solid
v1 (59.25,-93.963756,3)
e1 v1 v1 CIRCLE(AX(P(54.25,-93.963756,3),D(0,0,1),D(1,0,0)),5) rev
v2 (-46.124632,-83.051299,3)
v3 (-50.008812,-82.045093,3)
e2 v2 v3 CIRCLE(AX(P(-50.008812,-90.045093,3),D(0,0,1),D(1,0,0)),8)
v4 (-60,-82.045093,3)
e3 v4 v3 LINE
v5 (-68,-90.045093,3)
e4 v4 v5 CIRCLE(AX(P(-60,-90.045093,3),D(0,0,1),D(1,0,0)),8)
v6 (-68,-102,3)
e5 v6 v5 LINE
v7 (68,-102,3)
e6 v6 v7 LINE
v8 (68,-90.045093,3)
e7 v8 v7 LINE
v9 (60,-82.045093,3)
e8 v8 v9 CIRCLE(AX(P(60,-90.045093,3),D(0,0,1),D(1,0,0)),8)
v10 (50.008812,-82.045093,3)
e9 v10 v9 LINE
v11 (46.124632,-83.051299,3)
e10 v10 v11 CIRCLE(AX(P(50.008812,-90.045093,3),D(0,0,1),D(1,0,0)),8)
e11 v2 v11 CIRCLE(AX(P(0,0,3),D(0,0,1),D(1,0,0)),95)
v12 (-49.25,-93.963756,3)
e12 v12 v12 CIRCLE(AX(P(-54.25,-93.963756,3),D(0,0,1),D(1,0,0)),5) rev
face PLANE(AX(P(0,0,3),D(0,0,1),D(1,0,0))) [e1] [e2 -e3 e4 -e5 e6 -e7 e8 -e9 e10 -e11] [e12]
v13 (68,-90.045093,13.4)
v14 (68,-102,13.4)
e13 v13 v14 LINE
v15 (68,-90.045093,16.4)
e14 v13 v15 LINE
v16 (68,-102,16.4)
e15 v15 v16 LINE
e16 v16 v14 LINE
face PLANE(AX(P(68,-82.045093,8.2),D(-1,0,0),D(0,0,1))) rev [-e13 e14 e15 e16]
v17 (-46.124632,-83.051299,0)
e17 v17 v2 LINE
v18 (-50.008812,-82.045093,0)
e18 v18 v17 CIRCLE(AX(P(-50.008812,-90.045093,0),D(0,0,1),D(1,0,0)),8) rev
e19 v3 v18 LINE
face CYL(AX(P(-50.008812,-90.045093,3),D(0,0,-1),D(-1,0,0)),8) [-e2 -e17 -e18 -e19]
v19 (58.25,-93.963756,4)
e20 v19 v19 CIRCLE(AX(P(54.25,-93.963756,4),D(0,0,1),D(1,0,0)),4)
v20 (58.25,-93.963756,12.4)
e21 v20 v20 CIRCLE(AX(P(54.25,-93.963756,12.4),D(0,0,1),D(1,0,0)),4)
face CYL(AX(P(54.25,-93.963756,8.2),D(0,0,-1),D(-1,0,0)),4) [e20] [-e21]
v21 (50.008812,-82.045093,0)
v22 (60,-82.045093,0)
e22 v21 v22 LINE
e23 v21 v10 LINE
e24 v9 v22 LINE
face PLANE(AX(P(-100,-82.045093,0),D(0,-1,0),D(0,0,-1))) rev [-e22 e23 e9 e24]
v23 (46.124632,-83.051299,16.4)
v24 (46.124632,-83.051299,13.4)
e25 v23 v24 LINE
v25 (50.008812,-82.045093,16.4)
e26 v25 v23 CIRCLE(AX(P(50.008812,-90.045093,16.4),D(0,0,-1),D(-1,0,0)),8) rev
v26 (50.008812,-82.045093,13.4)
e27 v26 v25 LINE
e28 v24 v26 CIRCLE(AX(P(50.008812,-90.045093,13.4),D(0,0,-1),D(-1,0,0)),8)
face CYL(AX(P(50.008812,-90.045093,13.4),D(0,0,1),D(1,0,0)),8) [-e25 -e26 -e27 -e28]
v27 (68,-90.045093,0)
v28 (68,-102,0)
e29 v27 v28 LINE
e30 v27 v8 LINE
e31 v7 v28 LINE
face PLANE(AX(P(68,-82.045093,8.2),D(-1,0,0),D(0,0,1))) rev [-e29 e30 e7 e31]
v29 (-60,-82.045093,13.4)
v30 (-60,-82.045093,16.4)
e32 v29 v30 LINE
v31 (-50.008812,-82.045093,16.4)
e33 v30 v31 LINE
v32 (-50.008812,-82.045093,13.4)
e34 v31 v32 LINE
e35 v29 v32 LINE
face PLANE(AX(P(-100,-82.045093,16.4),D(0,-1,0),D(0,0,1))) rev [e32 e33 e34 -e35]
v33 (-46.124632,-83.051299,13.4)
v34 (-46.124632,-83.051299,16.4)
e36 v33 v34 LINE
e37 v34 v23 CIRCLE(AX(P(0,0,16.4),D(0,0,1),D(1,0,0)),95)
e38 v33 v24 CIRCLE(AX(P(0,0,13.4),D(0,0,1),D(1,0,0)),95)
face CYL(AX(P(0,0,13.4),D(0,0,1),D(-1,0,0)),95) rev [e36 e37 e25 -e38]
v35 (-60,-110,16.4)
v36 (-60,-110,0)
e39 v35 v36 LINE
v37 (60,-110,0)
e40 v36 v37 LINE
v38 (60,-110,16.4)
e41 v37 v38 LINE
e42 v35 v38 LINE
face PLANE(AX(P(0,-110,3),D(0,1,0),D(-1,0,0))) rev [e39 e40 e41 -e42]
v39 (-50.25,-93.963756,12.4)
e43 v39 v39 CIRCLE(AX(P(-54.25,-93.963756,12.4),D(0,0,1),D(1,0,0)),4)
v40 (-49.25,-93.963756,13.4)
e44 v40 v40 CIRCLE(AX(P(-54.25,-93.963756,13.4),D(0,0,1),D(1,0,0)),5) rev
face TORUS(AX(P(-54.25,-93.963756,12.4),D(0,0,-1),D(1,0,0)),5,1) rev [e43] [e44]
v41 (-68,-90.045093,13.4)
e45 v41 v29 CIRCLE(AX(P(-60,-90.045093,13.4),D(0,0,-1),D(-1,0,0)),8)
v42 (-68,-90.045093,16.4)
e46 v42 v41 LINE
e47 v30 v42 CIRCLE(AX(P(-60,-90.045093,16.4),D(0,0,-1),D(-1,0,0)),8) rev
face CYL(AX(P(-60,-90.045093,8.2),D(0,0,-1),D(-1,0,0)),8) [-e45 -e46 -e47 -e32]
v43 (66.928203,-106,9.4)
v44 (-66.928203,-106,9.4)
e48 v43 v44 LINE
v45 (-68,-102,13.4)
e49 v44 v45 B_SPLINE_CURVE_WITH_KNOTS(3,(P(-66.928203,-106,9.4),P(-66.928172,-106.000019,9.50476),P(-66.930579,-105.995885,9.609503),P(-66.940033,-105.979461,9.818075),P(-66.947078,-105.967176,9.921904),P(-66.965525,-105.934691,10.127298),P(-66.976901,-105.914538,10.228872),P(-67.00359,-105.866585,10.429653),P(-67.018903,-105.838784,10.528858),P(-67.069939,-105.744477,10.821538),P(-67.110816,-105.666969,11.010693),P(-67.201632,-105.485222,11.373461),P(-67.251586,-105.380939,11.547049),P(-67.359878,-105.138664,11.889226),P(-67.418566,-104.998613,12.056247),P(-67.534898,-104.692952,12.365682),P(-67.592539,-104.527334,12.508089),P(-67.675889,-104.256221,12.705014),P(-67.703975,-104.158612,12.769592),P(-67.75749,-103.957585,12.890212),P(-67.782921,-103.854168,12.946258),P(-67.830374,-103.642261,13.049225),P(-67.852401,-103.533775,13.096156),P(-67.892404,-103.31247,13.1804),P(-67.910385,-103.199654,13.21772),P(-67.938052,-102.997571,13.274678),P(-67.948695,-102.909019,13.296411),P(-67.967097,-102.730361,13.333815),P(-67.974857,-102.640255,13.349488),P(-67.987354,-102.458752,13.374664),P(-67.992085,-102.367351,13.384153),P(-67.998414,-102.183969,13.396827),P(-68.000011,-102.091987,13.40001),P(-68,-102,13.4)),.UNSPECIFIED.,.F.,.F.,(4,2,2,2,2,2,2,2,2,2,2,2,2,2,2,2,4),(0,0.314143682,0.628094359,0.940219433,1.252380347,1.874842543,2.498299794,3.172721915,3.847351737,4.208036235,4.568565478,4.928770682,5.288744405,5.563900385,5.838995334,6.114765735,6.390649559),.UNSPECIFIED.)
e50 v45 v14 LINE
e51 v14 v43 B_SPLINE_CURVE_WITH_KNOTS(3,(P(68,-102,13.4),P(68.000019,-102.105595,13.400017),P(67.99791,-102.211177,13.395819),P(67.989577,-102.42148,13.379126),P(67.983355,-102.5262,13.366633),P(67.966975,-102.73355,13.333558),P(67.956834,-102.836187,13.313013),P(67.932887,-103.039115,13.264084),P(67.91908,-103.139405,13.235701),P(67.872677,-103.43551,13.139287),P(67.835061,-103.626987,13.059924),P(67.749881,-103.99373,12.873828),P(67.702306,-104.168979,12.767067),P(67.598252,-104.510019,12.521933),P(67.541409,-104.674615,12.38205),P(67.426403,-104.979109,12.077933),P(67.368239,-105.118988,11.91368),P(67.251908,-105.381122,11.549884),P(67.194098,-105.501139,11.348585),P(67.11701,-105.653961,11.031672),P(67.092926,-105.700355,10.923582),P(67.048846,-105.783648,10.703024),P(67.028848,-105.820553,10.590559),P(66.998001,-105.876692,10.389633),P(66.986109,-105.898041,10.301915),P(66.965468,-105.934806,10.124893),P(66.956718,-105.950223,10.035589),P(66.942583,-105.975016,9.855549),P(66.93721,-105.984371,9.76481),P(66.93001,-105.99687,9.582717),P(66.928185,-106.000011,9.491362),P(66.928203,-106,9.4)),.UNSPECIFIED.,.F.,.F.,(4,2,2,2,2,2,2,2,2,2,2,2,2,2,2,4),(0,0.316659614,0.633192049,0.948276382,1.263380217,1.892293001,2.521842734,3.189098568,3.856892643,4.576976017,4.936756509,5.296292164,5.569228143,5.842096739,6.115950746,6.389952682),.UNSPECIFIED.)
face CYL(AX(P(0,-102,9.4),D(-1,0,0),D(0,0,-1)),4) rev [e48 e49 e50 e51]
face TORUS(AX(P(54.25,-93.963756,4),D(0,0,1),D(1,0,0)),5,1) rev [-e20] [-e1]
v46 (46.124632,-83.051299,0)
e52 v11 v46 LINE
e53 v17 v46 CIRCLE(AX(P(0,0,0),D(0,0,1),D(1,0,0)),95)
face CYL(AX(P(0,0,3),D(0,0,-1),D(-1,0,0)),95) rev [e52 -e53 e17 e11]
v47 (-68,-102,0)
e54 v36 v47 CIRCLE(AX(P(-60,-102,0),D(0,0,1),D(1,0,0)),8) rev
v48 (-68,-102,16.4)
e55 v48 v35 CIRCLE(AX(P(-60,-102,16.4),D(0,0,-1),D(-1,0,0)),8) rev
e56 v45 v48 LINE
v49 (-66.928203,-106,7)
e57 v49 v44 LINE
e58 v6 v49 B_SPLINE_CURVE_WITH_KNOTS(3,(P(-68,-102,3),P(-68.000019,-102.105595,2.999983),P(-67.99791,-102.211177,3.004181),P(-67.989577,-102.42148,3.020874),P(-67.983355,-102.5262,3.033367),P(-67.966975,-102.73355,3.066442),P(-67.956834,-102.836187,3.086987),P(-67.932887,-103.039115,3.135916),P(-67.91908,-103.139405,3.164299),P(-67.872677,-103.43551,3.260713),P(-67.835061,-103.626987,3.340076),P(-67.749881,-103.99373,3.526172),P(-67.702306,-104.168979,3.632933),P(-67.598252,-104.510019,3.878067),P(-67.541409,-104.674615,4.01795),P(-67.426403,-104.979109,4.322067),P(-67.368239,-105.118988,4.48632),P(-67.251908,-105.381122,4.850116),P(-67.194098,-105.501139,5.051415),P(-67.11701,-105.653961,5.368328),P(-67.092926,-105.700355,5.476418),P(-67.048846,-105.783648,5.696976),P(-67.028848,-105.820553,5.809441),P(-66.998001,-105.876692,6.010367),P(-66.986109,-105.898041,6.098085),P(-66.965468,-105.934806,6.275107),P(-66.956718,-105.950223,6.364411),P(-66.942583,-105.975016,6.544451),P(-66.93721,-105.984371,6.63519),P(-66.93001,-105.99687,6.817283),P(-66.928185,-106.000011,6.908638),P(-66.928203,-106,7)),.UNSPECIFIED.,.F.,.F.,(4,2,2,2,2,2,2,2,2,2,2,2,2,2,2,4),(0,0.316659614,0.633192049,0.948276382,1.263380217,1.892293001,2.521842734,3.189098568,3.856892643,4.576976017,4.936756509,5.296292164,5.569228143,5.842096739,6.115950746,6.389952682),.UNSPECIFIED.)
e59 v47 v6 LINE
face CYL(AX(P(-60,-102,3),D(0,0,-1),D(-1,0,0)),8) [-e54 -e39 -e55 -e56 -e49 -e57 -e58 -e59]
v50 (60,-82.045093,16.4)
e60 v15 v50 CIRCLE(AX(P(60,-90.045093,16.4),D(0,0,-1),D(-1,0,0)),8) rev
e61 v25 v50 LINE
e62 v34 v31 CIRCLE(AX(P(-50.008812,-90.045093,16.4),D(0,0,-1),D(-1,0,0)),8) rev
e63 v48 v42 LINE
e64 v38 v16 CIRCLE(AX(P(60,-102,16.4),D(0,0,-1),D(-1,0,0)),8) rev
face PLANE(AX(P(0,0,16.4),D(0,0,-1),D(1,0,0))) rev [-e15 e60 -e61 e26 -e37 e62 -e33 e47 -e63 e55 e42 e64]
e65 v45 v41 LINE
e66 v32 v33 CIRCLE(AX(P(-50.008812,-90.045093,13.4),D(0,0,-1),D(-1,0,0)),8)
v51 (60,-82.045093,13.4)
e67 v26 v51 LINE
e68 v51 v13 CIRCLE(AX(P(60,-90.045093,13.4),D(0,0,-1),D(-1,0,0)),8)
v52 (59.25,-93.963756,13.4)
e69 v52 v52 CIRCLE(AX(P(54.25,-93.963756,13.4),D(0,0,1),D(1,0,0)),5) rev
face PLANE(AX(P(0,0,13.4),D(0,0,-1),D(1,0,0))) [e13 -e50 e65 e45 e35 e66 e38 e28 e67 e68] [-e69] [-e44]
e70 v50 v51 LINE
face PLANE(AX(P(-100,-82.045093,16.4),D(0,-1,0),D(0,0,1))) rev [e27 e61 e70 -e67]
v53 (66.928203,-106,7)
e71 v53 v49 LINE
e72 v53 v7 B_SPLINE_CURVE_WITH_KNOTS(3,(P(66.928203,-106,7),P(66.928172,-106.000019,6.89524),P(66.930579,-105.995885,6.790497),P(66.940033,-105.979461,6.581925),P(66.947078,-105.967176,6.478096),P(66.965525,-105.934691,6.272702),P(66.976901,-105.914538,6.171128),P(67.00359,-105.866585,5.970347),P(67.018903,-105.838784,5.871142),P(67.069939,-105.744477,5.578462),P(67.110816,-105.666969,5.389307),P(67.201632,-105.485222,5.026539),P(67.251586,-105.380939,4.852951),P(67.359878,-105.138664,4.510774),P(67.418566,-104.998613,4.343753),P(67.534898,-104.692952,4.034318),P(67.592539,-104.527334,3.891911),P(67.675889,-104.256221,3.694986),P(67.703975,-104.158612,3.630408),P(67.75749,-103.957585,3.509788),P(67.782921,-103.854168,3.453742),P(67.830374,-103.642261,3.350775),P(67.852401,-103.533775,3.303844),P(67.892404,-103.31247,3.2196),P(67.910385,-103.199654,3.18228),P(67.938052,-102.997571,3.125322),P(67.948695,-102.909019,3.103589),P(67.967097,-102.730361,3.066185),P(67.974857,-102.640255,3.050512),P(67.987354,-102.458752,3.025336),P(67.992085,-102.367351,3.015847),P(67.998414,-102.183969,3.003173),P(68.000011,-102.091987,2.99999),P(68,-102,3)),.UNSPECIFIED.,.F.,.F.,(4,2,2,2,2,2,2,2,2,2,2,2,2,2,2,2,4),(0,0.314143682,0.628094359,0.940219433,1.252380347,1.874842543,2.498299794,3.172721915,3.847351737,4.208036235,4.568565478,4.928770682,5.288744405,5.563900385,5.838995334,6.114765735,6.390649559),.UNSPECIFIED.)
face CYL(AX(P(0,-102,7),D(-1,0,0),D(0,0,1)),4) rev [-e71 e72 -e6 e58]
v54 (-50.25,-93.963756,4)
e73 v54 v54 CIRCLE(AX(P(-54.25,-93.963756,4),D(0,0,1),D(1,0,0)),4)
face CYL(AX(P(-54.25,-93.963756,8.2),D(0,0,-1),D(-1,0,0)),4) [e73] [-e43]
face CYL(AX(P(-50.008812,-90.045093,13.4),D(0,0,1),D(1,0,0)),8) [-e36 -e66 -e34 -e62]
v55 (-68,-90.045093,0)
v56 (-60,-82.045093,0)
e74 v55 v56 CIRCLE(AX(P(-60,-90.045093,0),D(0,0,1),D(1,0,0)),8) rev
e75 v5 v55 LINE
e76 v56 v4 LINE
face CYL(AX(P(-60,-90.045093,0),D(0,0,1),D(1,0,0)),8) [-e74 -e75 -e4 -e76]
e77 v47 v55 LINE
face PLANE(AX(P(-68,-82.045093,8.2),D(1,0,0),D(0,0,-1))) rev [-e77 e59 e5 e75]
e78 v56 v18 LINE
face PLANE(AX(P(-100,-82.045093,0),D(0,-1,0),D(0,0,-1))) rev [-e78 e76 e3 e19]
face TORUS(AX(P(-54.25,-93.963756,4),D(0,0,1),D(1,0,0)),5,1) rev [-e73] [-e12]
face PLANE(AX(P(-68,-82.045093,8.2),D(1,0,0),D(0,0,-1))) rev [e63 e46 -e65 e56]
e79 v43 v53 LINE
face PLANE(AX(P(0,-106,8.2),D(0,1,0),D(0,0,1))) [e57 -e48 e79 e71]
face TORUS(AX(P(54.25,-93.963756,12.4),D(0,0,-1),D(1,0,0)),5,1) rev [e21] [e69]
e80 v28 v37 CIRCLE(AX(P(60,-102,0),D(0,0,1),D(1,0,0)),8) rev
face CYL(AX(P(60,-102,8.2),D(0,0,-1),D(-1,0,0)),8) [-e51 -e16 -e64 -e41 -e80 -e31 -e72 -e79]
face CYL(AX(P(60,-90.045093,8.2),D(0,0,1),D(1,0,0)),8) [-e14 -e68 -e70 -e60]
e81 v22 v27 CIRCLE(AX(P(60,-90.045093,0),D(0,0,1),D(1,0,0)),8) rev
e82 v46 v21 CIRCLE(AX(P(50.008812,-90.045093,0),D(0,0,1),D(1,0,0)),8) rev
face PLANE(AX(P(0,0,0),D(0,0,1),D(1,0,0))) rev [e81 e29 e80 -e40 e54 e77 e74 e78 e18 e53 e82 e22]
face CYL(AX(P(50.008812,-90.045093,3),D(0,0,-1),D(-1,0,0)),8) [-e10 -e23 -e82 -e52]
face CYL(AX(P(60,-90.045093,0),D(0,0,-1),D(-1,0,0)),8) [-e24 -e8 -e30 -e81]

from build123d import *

# Parameters (mm, degrees)
BOSS_EXTRUDE1_DEPTH     = 3
SKETCH2_R               = 4
SKETCH2_W               = 200
SKETCH2_H               = 4
BOSS_EXTRUDE2_DEPTH     = 5.2
CUT_EXTRUDE3_DEPTH      = 149.751605033
CUT_EXTRUDE3_DEPTH_BACK = 149.751605033
SKETCH4_W               = 200.256598964
SKETCH4_H               = 45.821107358
CUT_EXTRUDE4_DEPTH      = 149.886668308
CUT_EXTRUDE4_DEPTH_BACK = 149.886668308
SKETCH5_W               = 32
SKETCH5_H               = 27.954907266
FILLET1_R               = 1
FILLET2_R               = 4
FILLET3_R               = 8
FILLET4_R               = 8


with BuildPart() as part:
    # Sketch1 → Boss-Extrude1 (new body)
    with BuildSketch(Plane.XY):
        with BuildLine():
            ThreePointArc((0, -110), (-59.410296816, -92.57654472), (-100, -45.82575695))
            Line((-100, -45.82575695), (-100, -110))
            Line((-100, -110), (0, -110))
        make_face()
        with BuildLine():
            ThreePointArc((0, -95), (-51.308892705, -79.95247044), (-86.363636364, -39.576790093))
            Line((-86.363636364, -39.576790093), (-100, -45.82575695))
            ThreePointArc((-100, -45.82575695), (-59.410296816, -92.57654472), (0, -110))
            Line((0, -110), (0, -95))
        make_face()
        with BuildLine():
            Line((100, -45.82575695), (86.363636364, -39.576790093))
            ThreePointArc((86.363636364, -39.576790093), (51.308892705, -79.95247044), (0, -95))
            Line((0, -95), (0, -110))
            ThreePointArc((0, -110), (59.410296816, -92.57654472), (100, -45.82575695))
        make_face()
        with BuildLine():
            Line((100, -110), (100, -45.82575695))
            ThreePointArc((100, -45.82575695), (59.410296816, -92.57654472), (0, -110))
            Line((0, -110), (100, -110))
        make_face()
    extrude(amount=BOSS_EXTRUDE1_DEPTH)

    # Sketch2 → Boss-Extrude2 (add)
    with BuildSketch(Plane.XY.offset(3)):
        with Locations((-54.25, -93.963756311)):
            Circle(SKETCH2_R)
        with Locations((54.25, -93.963756311)):
            Circle(SKETCH2_R)
        with Locations((0, -108)):
            Rectangle(SKETCH2_W, SKETCH2_H)
    extrude(amount=BOSS_EXTRUDE2_DEPTH)

    # Sketch4 → Cut-Extrude3 (cut, two sides: drawn at the far end of the back side and taken through both)
    with BuildSketch(Plane.XY.offset(3).offset(-CUT_EXTRUDE3_DEPTH_BACK)):
        with Locations((0.128299482, -59.134539055)):
            Rectangle(SKETCH4_W, SKETCH4_H)
    extrude(amount=CUT_EXTRUDE3_DEPTH + CUT_EXTRUDE3_DEPTH_BACK, mode=Mode.SUBTRACT)

    # Sketch5 → Cut-Extrude4 (cut, two sides: drawn at the far end of the back side and taken through both)
    with BuildSketch(Plane(origin=(0, 0, 0), x_dir=(-1, 0, 0), z_dir=(0, 0, -1)).offset(-CUT_EXTRUDE4_DEPTH_BACK)):
        with Locations((-84, -96.022546367)):
            Rectangle(SKETCH5_W, SKETCH5_H)
        with Locations((84, -96.022546367)):
            Rectangle(SKETCH5_W, SKETCH5_H)
    extrude(amount=CUT_EXTRUDE4_DEPTH + CUT_EXTRUDE4_DEPTH_BACK, mode=Mode.SUBTRACT)

    # Fillet1
    fillet1_edges = [part.edges().sort_by_distance(p)[0] for p in [
        (50.25, -93.963756311, 3),
        (-58.25, -93.963756311, 3),
    ]]
    fillet(fillet1_edges, radius=FILLET1_R)

    # Fillet2
    fillet2_edges = [part.edges().sort_by_distance(p)[0] for p in [
        (0, -106, 3),
    ]]
    fillet(fillet2_edges, radius=FILLET2_R)

    # Mirror1: part across plane


with BuildPart() as part_1:
    add(part.part)
    add(part.part.mirror(Plane.XY.offset(8.2)))

    # Fillet3
    # the kernel refuses this fillet: 8 mm, written as the material it takes off along each edge
    with BuildSketch(Plane(origin=(-68, -110, -20), x_dir=(1, 0, 0), z_dir=(0, 0, 1)), Plane(origin=(68, -110, 36.4), x_dir=(-1, 0, 0), z_dir=(0, 0, -1))) as fillet3_piece_1:
        with BuildLine():
            CenterArc((FILLET3_R, FILLET3_R), FILLET3_R, 180, 90)
            Line((0, FILLET3_R), (0, 0))
            Line((0, 0), (FILLET3_R, 0))
        make_face()
    extrude(amount=56.4, mode=Mode.SUBTRACT)
    with BuildSketch(Plane(origin=(-68, -82.045092734, -6.6), x_dir=(1, 0, 0), z_dir=(0, 0, 1)), Plane(origin=(68, -82.045092734, 36.4), x_dir=(-1, 0, 0), z_dir=(0, 0, -1))) as fillet3_piece_2:
        with BuildLine():
            CenterArc((FILLET3_R, -FILLET3_R), FILLET3_R, 90, 90)
            Line((0, -FILLET3_R), (0, 0))
            Line((0, 0), (FILLET3_R, 0))
        make_face()
    extrude(amount=43, mode=Mode.SUBTRACT)
    with BuildSketch(Plane(origin=(68, -82.045092734, -20), x_dir=(-1, 0, 0), z_dir=(0, 0, 1)), Plane(origin=(-68, -82.045092734, 23), x_dir=(1, 0, 0), z_dir=(0, 0, -1))) as fillet3_piece_3:
        with BuildLine():
            CenterArc((FILLET3_R, FILLET3_R), FILLET3_R, 180, 90)
            Line((0, FILLET3_R), (0, 0))
            Line((0, 0), (FILLET3_R, 0))
        make_face()
    extrude(amount=43, mode=Mode.SUBTRACT)

    # Fillet4
    fillet4_edges = [part_1.edges().sort_by_distance(p)[0] for p in [
        (-47.891572936, -82.045092734, 14.9),
        (47.891572936, -82.045092734, 14.9),
        (-47.891572936, -82.045092734, 1.5),
        (47.891572936, -82.045092734, 1.5),
    ]]
    fillet(fillet4_edges, radius=FILLET4_R)


solid = part_1.part
